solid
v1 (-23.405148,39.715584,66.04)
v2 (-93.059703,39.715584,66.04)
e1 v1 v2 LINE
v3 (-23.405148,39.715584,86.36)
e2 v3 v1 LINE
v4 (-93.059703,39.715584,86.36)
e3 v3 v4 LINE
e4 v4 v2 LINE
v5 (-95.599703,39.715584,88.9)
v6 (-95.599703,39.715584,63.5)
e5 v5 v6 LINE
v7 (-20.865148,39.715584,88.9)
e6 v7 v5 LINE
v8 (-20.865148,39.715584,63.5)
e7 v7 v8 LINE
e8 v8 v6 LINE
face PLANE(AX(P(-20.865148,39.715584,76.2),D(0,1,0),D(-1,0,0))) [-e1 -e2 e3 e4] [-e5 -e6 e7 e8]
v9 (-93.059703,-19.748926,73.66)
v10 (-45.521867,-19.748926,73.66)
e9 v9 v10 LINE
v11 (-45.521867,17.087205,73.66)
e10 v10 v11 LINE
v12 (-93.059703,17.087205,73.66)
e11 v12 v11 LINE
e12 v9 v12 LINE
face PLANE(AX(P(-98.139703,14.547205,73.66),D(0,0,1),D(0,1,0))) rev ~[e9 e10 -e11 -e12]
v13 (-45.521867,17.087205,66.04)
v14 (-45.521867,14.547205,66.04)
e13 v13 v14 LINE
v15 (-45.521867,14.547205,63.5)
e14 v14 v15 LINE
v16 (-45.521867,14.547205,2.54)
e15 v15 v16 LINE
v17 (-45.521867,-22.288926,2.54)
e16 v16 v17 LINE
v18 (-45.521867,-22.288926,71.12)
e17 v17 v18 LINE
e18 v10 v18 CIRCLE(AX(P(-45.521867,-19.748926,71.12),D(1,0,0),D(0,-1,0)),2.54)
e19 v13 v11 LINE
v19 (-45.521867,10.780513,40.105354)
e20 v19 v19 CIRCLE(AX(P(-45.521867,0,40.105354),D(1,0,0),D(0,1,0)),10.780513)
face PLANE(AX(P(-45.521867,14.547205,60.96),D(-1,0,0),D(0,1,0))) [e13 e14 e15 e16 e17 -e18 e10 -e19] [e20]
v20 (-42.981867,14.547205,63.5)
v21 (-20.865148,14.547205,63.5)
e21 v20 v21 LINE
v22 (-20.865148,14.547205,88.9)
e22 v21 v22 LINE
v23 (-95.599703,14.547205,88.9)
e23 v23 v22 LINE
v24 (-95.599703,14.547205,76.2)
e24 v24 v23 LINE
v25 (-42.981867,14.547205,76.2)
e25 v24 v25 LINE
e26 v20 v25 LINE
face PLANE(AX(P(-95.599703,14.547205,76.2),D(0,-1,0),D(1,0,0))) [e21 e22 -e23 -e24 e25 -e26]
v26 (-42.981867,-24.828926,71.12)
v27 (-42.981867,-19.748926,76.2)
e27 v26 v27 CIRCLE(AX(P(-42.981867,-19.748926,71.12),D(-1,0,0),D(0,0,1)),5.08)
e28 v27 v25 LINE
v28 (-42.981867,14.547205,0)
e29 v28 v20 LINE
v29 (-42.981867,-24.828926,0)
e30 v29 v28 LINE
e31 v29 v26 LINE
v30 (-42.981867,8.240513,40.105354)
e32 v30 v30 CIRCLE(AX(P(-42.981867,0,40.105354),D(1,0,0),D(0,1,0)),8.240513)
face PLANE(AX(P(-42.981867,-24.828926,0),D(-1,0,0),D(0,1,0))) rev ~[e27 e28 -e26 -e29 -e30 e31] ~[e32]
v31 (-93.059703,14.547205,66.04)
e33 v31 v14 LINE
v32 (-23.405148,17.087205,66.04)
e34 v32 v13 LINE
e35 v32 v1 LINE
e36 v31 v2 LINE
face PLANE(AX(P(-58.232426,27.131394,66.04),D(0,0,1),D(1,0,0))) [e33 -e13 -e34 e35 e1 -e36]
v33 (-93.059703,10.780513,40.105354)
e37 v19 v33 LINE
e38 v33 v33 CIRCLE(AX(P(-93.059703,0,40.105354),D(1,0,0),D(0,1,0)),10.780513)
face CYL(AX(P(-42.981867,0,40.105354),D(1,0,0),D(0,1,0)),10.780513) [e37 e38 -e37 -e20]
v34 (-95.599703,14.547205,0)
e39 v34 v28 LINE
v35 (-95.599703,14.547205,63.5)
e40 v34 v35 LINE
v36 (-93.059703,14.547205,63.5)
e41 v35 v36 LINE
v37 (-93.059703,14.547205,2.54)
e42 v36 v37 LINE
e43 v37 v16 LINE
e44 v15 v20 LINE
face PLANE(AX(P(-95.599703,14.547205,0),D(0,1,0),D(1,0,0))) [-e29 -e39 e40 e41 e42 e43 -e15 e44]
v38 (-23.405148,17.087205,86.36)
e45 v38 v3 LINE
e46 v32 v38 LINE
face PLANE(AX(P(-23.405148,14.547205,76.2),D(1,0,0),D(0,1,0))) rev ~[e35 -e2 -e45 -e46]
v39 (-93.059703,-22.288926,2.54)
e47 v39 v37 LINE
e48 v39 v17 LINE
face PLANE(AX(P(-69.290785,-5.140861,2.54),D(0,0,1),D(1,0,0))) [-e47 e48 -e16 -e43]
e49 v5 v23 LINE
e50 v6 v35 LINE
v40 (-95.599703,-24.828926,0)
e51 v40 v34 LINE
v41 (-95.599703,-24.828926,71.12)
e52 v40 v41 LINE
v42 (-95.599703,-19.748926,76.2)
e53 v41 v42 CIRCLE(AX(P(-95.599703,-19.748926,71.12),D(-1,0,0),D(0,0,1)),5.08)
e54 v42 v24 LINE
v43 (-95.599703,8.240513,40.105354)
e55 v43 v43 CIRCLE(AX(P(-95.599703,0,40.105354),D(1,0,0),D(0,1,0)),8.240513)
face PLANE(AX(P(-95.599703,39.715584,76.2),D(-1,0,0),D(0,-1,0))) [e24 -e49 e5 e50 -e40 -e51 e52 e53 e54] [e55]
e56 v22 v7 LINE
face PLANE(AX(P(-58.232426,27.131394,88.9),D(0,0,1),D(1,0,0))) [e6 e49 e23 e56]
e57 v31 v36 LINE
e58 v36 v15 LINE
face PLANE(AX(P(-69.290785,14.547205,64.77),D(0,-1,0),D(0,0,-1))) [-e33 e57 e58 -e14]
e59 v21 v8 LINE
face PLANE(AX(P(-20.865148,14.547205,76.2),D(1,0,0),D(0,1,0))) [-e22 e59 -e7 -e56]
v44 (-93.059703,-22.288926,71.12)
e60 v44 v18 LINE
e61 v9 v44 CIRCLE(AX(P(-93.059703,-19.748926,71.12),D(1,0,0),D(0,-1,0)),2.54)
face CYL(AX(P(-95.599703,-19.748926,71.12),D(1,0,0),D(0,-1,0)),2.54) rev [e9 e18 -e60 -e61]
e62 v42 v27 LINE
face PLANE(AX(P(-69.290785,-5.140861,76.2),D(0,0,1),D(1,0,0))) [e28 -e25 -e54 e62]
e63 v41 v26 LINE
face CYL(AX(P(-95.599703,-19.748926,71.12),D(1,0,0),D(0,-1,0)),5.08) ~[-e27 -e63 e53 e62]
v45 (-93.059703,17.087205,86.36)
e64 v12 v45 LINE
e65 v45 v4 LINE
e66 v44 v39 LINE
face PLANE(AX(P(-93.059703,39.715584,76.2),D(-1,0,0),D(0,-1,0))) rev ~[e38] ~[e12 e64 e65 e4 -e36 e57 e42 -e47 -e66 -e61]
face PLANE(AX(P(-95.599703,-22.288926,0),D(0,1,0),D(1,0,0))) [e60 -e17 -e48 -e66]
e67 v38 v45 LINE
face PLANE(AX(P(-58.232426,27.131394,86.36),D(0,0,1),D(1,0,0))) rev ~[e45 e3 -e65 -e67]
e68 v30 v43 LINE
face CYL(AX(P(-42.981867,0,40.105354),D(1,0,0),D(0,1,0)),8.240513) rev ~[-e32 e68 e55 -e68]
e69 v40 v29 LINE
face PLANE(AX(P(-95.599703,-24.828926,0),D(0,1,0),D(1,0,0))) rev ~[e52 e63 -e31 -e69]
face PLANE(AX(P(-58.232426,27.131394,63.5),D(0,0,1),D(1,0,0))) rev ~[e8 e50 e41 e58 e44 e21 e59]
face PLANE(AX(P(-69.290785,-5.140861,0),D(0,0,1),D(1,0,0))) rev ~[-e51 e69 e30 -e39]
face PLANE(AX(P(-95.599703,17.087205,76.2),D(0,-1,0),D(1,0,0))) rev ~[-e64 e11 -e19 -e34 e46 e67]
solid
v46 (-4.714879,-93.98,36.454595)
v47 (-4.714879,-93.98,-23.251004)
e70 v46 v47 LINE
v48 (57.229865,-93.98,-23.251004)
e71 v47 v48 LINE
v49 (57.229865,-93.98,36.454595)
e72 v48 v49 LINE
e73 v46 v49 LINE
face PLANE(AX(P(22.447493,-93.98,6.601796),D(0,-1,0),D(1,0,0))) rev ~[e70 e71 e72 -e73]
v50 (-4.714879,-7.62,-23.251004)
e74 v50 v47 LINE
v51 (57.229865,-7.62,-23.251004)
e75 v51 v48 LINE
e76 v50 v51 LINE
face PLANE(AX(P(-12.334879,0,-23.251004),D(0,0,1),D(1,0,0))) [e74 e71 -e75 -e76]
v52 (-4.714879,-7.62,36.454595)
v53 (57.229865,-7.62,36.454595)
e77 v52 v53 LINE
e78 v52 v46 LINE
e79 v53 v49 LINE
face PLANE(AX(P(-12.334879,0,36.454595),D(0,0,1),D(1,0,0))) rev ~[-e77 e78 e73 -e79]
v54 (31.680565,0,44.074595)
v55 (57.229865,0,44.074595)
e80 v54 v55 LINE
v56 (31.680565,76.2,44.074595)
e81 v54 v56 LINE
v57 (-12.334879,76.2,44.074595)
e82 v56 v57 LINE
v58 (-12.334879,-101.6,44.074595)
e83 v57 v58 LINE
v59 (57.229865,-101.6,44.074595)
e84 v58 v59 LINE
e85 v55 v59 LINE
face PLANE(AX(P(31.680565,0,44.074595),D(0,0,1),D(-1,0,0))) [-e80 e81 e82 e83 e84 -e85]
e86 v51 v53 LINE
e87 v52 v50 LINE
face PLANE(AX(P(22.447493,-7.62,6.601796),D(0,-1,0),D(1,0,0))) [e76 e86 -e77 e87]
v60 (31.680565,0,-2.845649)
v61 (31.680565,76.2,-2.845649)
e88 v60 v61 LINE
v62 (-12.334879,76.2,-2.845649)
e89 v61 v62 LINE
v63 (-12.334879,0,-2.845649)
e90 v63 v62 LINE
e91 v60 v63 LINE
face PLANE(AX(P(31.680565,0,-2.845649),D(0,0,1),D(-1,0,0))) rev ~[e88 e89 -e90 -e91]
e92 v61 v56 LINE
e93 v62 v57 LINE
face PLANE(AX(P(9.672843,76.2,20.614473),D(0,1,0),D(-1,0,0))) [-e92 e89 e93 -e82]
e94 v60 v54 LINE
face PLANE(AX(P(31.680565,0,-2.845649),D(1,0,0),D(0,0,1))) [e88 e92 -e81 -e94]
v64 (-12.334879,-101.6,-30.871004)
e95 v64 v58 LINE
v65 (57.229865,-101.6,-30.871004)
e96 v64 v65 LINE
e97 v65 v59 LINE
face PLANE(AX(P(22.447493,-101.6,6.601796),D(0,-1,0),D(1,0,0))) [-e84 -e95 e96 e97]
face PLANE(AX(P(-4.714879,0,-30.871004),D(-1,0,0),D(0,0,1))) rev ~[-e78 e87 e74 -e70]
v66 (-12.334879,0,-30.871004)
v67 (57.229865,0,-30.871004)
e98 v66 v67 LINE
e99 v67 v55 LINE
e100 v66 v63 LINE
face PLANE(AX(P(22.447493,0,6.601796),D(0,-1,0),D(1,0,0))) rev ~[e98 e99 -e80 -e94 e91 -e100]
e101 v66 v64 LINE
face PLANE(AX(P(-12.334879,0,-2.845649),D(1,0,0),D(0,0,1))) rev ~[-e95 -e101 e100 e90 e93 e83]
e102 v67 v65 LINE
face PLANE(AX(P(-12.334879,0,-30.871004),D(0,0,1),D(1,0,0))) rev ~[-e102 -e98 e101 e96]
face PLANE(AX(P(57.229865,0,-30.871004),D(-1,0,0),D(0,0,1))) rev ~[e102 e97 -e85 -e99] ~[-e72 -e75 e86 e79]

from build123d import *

# Parameters (mm, degrees)
F0_W        = 52.6178367436
F0_H        = 39.3761303276
F1_DEPTH    = 76.2
F2_R        = 5.08
F3_R        = 8.240513031
F4_DEPTH    = 52.6188367436
F6_DEPTH    = 12.7
F7_T        = 2.54
F7_T3_DEPTH = 57.6978367436
F7_T5_DEPTH = 17.78
F8_W        = 69.5647448301
F8_H        = 74.9455988407
F9_DEPTH    = 101.6
F10_T       = -7.62
F11_W       = 44.0154448152
F11_H       = 46.9202438835
F12_DEPTH   = 76.2


# Not quite as in the source:
# - a shell that OpenCascade refuses in one call is made with other operations: the cavity is built on its own and cut out


with BuildPart() as f1:
    # F0 (on Top) → F1 (new body)
    with BuildSketch(Plane.XY):
        with Locations((-69.2907851189, -5.140860565)):
            Rectangle(F0_W, F0_H)
    extrude(amount=F1_DEPTH)

    # F2
    f2_edges = [f1.edges().sort_by_distance(p)[0] for p in [
        (-69.290785, -24.828926, 76.2),
    ]]
    fillet(f2_edges, radius=F2_R)

    # F3 (on face) → F4 (cut, through all)
    with BuildSketch(Plane.YZ.offset(-42.9818667471)):
        with Locations((0, 40.1053540409)):
            Circle(F3_R)
    extrude(amount=-F4_DEPTH, mode=Mode.SUBTRACT)

    # F5 (on face) → F6 (join, symmetric)
    with BuildSketch(Plane.XY.offset(76.2)):
        Polygon((-95.5997034907, 39.7155843675), (-95.5997034907, 14.5472045988), (-42.9818667471, 14.5472045988), (-20.8651479334, 14.5472045988), (-20.8651479334, 39.7155843675), align=None)
    extrude(amount=F6_DEPTH, both=True)

    # F7: shell of thickness 2.54, made by hand


with BuildPart() as f7_core1:
    # F7_t2: copy of F1
    add(f1.part)

    # the walls: a layer under each face that stays
    f7_faces = [f7_core1.faces().sort_by_distance(p)[0] for p in [
        (-95.5997034907, 7.4433293194, 44.45),
        (-69.2907851189, -24.8289257288, 35.56),
        (-69.2907851189, -23.3410281772, 74.7121024484),
        (-69.2907851189, -5.140860565, 0),
        (-69.2907851189, -2.600860565, 76.2),
        (-69.2907851189, -8.240513031, 40.1053540409),
        (-42.9818667471, -18.2662373409, 63.5),
        (-83.1439442312, 14.5472045988, 84.6666666667),
        (-58.232425712, 27.1313944831, 63.5),
        (-58.232425712, 27.1313944831, 88.9),
        (-20.8651479334, 27.1313944831, 76.2),
    ]]
    thicken(f7_faces, amount=-F7_T, mode=Mode.SUBTRACT)

    # F7_s4 → F7_t3 (cut)
    with BuildSketch(Plane.YZ.offset(-98.1397034907)):
        Polygon((14.5218045988, 76.2254), (14.5472045988, 73.66), (17.0872045988, 73.66), (17.0872045988, 76.2), align=None)
    extrude(amount=F7_T3_DEPTH, mode=Mode.SUBTRACT)

    # F7_s6 → F7_t5 (cut)
    with BuildSketch(Plane.XY.offset(60.96)):
        Polygon((-42.9564667471, 14.5218045988), (-45.5218667471, 14.5472045988), (-45.5218667471, 17.0872045988), (-42.9818667471, 17.0872045988), align=None)
    extrude(amount=F7_T5_DEPTH, mode=Mode.SUBTRACT)


with BuildPart() as f1_1:
    add(f1.part)

    # what is left inside the walls is the cavity
    f7_cavity = [f7_core1.part.solids().sort_by_distance(p)[0] for p in [
        (-69.290785, -22.263526, 48.26),
    ]]
    add(f7_cavity, mode=Mode.SUBTRACT)


with BuildPart() as f9:
    # F8 (on Front) → F9 (new body)
    with BuildSketch(Plane.XZ):
        with Locations((22.4474929273, 6.6017955542)):
            Rectangle(F8_W, F8_H)
    extrude(amount=F9_DEPTH)

    # F10
    f10_openings = [f9.faces().sort_by_distance(p)[0] for p in [
        (57.229865, -50.8, 6.601796),
    ]]
    offset(amount=F10_T, openings=f10_openings)

    # F11 (on face) → F12 (join)
    with BuildSketch(Plane(origin=(0, 0, 0), x_dir=(-1, 0, 0), z_dir=(0, 1, 0))):
        with Locations((-9.6728429198, 20.6144730328)):
            Rectangle(F11_W, F11_H)
    extrude(amount=F12_DEPTH)


solid = Compound([f1_1.part, f9.part])
